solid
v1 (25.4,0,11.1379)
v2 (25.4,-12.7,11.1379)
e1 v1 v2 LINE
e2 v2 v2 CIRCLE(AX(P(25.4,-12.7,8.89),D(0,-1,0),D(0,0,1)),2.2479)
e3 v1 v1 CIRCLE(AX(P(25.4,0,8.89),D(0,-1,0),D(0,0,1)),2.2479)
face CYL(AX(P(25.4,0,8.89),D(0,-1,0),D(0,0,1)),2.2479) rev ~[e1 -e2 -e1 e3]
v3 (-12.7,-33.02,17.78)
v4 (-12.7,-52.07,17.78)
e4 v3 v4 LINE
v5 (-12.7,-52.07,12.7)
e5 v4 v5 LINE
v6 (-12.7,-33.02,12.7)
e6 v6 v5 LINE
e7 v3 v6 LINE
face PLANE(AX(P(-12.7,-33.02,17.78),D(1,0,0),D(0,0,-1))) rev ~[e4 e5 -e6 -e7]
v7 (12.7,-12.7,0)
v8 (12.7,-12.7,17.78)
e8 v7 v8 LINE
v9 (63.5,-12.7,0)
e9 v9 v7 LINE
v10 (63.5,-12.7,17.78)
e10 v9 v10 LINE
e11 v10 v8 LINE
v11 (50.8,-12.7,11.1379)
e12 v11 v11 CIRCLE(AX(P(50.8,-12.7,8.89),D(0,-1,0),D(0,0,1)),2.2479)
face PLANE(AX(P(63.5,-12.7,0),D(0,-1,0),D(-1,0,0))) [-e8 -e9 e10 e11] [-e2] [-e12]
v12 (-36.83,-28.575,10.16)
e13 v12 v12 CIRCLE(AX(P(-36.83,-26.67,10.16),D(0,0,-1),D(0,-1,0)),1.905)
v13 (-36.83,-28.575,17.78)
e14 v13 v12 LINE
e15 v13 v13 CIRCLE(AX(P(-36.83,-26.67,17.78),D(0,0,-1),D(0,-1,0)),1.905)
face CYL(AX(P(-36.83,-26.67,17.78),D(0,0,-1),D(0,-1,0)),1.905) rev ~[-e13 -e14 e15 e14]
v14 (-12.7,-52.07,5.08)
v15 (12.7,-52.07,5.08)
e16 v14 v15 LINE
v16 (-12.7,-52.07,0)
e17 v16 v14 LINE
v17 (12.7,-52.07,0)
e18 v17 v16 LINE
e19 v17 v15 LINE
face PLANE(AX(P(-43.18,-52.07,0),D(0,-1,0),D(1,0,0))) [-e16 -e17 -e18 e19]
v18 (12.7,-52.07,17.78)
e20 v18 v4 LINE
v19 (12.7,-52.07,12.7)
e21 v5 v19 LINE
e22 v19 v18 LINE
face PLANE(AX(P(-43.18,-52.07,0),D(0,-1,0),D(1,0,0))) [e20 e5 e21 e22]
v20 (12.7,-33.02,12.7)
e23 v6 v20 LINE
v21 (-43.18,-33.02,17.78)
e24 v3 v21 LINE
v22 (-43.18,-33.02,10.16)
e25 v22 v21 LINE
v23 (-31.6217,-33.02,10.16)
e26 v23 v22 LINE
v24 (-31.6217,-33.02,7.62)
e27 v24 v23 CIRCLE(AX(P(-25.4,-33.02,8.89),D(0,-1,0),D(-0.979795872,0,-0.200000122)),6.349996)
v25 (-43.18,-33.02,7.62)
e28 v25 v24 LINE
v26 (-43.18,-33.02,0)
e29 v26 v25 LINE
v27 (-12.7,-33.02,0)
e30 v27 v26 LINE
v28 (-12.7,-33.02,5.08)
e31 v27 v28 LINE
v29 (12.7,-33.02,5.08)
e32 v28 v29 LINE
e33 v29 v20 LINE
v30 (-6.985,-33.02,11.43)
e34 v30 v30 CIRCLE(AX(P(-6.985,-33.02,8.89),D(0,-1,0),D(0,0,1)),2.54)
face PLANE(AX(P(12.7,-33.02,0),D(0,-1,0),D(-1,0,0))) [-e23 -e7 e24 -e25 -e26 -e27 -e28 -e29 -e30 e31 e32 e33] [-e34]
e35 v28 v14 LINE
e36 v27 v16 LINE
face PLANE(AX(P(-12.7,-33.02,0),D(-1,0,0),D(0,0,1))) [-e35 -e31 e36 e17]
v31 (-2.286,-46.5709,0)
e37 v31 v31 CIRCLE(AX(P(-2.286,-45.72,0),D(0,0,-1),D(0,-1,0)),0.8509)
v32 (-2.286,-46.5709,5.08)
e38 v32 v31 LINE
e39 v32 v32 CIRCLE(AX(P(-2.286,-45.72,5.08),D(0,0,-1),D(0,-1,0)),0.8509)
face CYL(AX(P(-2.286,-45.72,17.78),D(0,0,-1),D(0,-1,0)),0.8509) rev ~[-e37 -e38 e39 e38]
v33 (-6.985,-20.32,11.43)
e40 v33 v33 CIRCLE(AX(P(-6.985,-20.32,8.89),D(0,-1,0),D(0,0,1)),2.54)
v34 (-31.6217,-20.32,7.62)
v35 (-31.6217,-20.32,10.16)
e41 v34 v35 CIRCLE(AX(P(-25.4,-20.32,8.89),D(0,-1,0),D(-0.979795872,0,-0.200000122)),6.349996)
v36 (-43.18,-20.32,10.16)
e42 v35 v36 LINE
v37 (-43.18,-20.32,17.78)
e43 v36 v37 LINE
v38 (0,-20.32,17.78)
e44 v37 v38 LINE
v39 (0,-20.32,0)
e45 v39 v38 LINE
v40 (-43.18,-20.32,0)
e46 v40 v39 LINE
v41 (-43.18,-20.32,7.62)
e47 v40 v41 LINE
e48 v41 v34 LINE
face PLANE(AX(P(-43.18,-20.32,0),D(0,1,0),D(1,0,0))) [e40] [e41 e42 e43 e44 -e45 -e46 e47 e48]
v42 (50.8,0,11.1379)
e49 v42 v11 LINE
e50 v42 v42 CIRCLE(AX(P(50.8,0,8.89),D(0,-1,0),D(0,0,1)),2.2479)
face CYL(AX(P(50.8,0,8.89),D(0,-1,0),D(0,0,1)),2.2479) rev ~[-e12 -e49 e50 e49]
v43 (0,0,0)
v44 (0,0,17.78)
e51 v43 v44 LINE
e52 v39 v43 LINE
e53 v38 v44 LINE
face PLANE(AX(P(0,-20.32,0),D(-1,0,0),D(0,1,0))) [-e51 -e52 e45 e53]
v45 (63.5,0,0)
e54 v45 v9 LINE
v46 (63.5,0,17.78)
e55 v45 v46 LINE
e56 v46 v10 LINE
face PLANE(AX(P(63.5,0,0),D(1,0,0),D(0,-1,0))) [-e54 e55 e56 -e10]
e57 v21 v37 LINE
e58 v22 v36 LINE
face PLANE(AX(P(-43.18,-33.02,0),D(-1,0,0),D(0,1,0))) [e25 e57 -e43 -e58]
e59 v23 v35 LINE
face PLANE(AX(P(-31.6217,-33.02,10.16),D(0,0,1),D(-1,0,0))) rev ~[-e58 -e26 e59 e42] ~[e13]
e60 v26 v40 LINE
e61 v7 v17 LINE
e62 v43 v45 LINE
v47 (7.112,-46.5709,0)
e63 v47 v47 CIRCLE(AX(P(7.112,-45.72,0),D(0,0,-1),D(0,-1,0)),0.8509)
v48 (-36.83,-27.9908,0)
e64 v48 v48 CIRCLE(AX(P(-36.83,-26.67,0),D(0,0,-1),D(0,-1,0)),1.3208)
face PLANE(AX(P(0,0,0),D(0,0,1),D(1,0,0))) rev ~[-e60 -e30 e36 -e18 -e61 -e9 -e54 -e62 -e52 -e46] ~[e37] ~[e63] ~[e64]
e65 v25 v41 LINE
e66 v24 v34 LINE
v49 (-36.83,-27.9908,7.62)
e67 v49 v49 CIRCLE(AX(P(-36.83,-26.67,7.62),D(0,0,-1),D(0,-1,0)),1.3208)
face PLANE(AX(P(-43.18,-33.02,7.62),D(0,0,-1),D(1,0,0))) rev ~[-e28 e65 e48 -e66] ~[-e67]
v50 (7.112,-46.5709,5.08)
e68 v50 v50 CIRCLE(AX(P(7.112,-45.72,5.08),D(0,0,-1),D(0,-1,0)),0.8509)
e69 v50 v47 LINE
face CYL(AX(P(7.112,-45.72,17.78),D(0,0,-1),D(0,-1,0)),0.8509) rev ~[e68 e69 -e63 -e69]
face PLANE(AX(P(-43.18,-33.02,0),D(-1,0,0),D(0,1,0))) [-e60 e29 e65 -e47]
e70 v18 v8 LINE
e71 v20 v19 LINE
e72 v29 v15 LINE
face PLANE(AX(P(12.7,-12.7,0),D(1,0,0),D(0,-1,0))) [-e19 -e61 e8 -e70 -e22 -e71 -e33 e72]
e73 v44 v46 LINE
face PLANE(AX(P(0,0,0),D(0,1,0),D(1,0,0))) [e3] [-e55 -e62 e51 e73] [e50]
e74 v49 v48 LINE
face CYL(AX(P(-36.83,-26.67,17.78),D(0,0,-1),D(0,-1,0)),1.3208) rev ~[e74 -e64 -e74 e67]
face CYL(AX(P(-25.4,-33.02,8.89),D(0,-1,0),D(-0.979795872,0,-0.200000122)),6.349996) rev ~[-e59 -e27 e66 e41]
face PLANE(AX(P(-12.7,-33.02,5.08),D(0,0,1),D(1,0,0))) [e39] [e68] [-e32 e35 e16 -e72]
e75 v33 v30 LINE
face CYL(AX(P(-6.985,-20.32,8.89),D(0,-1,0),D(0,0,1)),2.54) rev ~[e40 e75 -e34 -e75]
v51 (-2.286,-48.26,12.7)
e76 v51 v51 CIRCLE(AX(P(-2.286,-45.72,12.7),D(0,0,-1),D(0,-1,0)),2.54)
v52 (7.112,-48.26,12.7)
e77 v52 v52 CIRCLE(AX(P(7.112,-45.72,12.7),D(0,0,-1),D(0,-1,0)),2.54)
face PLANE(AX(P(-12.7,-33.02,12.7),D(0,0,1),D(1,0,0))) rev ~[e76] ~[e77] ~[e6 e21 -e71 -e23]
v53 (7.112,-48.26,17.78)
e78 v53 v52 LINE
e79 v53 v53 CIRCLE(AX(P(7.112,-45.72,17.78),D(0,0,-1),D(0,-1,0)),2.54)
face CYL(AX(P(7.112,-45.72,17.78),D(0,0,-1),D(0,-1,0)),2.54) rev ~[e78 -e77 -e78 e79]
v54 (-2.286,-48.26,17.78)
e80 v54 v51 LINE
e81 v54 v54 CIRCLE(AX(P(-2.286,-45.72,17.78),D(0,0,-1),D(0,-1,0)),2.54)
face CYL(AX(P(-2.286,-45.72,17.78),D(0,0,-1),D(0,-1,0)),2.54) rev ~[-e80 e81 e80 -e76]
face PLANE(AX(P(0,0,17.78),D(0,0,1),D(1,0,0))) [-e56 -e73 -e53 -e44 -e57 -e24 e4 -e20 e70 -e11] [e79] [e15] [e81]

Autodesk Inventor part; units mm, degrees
ref_plane "YZ Plane" through (0, 0, 0) normal (1, 0, 0) x (0, 1, 0)
ref_plane "XZ Plane" through (0, 0, 0) normal (0, 1, 0) x (-1, 0, 0)
ref_plane "XY Plane" through (0, 0, 0) normal (0, 0, 1) x (1, 0, 0)
sketch "Sketch1" plane through (0, 0, 0) normal (0, 0, 1) x (1, 0, 0)
  line L0 (0, 0) -> (63.5, 0)
  line L1 (63.5, 0) -> (63.5, -12.7)
  line L2 (63.5, -12.7) -> (12.7, -12.7)
  line L3 (12.7, -12.7) -> (12.7, -33.02)
  line L4 (12.7, -33.02) -> (-43.18, -33.02)
  line L5 (-43.18, -33.02) -> (-43.18, -20.32)
  line L6 (-43.18, -20.32) -> (0, -20.32)
  line L7 (0, -20.32) -> (0, 0)
  dimension "d0" = 12.7
  dimension "d2" = 12.7
  dimension "d3" = 12.7
  dimension "d4" = 43.18
  dimension "d5" = 20.32
  dimension "d22" = 50.8
extrude "Extrusion1" add sketch "Sketch1" along normal blind 17.78
sketch "Sketch2" plane through (0, 0, 0) normal (0, 1, 0) x (1, 0, 0)
  line L0 (63.5, 0) -> (63.5, -17.78) projected
  line L1 (0, 0) -> (0, -17.78) projected
  line L2 (0, -8.89) -> (63.5, -8.89) construction
  point P0 (50.8, -8.89)
  point P1 (25.4, -8.89)
  dimension "d8" = 12.7
  dimension "d9" = 25.4
hole "Hole1" at (50.8, 0, 8.89) at (25.4, 0, 8.89) direction (0, -1, 0) diameter 4.4958 end through all clearance for "Flat Head Machine Screw (82)" size "#8" standard "Ansi Unified Screw Threads"
sketch "Sketch3" plane through (-43.18, -33.02, 0) normal (0, -1, 0) x (1, 0, 0)
  line L0 (0, 0) -> (0, 17.78) projected
  line L1 (55.88, 0) -> (55.88, 17.78) projected
  line L2 (0, 8.89) -> (55.88, 8.89) construction
  arc A0 (11.5583, 7.62) -> (11.5583, 10.16) centre (17.78, 8.89) ccw
  line L3 (11.5583, 10.16) -> (0, 10.16)
  line L4 (0, 7.62) -> (11.5583, 7.62)
  line L5 (0, 10.16) -> (0, 7.62)
  point P0 (43.18, 0)
  dimension "d17" = 12.7
  dimension "d18" = 17.78
  dimension "d19" = 2.54
extrude "Extrusion2" cut sketch "Sketch3" against normal up to next
sketch "Sketch4" plane through (0, 0, 17.78) normal (0, 0, 1) x (1, 0, 0)
  line L0 (-43.18, -33.02) -> (-43.18, -20.32) projected
  line L1 (12.7, -12.7) -> (12.7, -33.02) projected
  line L2 (-43.18, -26.67) -> (12.7, -26.67) construction
  point P0 (-36.83, -26.67)
  dimension "d23" = 6.35
hole "Hole3" at (-36.83, -26.67, 17.78) direction (0, 0, -1) diameter 3.81 end up to surface clearance for "Flat Head Machine Screw (82)" size "#6" standard "Ansi Unified Screw Threads"
hole "Hole4" at (-36.83, -26.67, 17.78) direction (0, 0, -1) diameter 2.6416 end through all thread size "6-32 UNC" class "2B" standard "ANSI Unified Screw Threads"
sketch "Sketch6" plane through (-43.18, -33.02, 0) normal (0, -1, 0) x (1, 0, 0)
  line L0 (0, 10.16) -> (11.5583, 10.16) projected
  arc A0 (11.5583, 7.62) -> (11.5583, 10.16) centre (17.78, 8.89) ccw projected
  line L1 (11.5583, 7.62) -> (0, 7.62) projected
  line L2 (0, 0) -> (0, 7.62) projected
  line L3 (55.88, 0) -> (0, 0) projected
  line L4 (55.88, 0) -> (55.88, 17.78) projected
  line L5 (55.88, 17.78) -> (0, 17.78) projected
  line L6 (0, 10.16) -> (0, 17.78) projected
  line L7 (55.88, 17.78) -> (30.48, 17.78)
  line L8 (30.48, 17.78) -> (30.48, 12.7)
  line L9 (30.48, 12.7) -> (55.88, 12.7)
  line L10 (55.88, 12.7) -> (55.88, 17.78)
  line L11 (55.88, 0) -> (30.48, 0)
  line L12 (30.48, 0) -> (30.48, 5.08)
  line L13 (30.48, 5.08) -> (55.88, 5.08)
  line L14 (55.88, 5.08) -> (55.88, 0)
  point P0 (43.18, 0)
  dimension "d56" = 5.08
  dimension "d57" = 25.4
  dimension "d58" = 5.08
  dimension "d59" = 25.4
extrude "Extrusion3" add sketch "Sketch6" along normal blind 19.05 contours L5 L4 L9 L8 | L12 L13 L4 L3
sketch "Sketch8" plane through (0, 0, 17.78) normal (0, 0, 1) x (1, 0, 0)
  line L0 (-12.7, -33.02) -> (-43.18, -33.02) projected
  line L1 (12.7, -12.7) -> (12.7, -52.07) projected
  point P0 (0, 0)
  point P1 (7.112, -45.72)
  point P2 (-2.286, -45.72)
  dimension "d66" = 12.7
  dimension "d67" = 12.7
  dimension "d68" = 14.986
  dimension "d69" = 9.398
hole "Hole6" at (7.112, -45.72, 17.78) at (-2.286, -45.72, 17.78) direction (0, 0, -1) diameter 5.08 end up to surface
hole "Hole7" at (-2.286, -45.72, 17.78) direction (0, 0, -1) diameter 1.7018 end through all
hole "Hole8" at (7.112, -45.72, 17.78) direction (0, 0, -1) diameter 1.7018 end through all
sketch "Sketch9" plane through (-43.18, -20.32, 0) normal (0, 1, 0) x (1, 0, 0)
  line L0 (11.5583, -10.16) -> (0, -10.16) projected
  line L1 (0, -10.16) -> (0, -17.78) projected
  line L2 (0, -17.78) -> (43.18, -17.78) projected
  line L3 (43.18, 0) -> (43.18, -17.78) projected
  line L4 (0, 0) -> (43.18, 0) projected
  line L5 (0, 0) -> (0, -7.62) projected
  line L6 (0, -7.62) -> (11.5583, -7.62) projected
  arc A0 (11.5583, -10.16) -> (11.5583, -7.62) centre (17.78, -8.89) ccw projected
  point P0 (36.195, -8.89)
  dimension "d95" = 18.415
hole "Hole9" at (-6.985, -20.32, 8.89) direction (0, -1, 0) diameter 5.08 end through all
equation "\"d67\" = d66"
properties part number "J001396" material "ALUMINUM, 6061-T651"
